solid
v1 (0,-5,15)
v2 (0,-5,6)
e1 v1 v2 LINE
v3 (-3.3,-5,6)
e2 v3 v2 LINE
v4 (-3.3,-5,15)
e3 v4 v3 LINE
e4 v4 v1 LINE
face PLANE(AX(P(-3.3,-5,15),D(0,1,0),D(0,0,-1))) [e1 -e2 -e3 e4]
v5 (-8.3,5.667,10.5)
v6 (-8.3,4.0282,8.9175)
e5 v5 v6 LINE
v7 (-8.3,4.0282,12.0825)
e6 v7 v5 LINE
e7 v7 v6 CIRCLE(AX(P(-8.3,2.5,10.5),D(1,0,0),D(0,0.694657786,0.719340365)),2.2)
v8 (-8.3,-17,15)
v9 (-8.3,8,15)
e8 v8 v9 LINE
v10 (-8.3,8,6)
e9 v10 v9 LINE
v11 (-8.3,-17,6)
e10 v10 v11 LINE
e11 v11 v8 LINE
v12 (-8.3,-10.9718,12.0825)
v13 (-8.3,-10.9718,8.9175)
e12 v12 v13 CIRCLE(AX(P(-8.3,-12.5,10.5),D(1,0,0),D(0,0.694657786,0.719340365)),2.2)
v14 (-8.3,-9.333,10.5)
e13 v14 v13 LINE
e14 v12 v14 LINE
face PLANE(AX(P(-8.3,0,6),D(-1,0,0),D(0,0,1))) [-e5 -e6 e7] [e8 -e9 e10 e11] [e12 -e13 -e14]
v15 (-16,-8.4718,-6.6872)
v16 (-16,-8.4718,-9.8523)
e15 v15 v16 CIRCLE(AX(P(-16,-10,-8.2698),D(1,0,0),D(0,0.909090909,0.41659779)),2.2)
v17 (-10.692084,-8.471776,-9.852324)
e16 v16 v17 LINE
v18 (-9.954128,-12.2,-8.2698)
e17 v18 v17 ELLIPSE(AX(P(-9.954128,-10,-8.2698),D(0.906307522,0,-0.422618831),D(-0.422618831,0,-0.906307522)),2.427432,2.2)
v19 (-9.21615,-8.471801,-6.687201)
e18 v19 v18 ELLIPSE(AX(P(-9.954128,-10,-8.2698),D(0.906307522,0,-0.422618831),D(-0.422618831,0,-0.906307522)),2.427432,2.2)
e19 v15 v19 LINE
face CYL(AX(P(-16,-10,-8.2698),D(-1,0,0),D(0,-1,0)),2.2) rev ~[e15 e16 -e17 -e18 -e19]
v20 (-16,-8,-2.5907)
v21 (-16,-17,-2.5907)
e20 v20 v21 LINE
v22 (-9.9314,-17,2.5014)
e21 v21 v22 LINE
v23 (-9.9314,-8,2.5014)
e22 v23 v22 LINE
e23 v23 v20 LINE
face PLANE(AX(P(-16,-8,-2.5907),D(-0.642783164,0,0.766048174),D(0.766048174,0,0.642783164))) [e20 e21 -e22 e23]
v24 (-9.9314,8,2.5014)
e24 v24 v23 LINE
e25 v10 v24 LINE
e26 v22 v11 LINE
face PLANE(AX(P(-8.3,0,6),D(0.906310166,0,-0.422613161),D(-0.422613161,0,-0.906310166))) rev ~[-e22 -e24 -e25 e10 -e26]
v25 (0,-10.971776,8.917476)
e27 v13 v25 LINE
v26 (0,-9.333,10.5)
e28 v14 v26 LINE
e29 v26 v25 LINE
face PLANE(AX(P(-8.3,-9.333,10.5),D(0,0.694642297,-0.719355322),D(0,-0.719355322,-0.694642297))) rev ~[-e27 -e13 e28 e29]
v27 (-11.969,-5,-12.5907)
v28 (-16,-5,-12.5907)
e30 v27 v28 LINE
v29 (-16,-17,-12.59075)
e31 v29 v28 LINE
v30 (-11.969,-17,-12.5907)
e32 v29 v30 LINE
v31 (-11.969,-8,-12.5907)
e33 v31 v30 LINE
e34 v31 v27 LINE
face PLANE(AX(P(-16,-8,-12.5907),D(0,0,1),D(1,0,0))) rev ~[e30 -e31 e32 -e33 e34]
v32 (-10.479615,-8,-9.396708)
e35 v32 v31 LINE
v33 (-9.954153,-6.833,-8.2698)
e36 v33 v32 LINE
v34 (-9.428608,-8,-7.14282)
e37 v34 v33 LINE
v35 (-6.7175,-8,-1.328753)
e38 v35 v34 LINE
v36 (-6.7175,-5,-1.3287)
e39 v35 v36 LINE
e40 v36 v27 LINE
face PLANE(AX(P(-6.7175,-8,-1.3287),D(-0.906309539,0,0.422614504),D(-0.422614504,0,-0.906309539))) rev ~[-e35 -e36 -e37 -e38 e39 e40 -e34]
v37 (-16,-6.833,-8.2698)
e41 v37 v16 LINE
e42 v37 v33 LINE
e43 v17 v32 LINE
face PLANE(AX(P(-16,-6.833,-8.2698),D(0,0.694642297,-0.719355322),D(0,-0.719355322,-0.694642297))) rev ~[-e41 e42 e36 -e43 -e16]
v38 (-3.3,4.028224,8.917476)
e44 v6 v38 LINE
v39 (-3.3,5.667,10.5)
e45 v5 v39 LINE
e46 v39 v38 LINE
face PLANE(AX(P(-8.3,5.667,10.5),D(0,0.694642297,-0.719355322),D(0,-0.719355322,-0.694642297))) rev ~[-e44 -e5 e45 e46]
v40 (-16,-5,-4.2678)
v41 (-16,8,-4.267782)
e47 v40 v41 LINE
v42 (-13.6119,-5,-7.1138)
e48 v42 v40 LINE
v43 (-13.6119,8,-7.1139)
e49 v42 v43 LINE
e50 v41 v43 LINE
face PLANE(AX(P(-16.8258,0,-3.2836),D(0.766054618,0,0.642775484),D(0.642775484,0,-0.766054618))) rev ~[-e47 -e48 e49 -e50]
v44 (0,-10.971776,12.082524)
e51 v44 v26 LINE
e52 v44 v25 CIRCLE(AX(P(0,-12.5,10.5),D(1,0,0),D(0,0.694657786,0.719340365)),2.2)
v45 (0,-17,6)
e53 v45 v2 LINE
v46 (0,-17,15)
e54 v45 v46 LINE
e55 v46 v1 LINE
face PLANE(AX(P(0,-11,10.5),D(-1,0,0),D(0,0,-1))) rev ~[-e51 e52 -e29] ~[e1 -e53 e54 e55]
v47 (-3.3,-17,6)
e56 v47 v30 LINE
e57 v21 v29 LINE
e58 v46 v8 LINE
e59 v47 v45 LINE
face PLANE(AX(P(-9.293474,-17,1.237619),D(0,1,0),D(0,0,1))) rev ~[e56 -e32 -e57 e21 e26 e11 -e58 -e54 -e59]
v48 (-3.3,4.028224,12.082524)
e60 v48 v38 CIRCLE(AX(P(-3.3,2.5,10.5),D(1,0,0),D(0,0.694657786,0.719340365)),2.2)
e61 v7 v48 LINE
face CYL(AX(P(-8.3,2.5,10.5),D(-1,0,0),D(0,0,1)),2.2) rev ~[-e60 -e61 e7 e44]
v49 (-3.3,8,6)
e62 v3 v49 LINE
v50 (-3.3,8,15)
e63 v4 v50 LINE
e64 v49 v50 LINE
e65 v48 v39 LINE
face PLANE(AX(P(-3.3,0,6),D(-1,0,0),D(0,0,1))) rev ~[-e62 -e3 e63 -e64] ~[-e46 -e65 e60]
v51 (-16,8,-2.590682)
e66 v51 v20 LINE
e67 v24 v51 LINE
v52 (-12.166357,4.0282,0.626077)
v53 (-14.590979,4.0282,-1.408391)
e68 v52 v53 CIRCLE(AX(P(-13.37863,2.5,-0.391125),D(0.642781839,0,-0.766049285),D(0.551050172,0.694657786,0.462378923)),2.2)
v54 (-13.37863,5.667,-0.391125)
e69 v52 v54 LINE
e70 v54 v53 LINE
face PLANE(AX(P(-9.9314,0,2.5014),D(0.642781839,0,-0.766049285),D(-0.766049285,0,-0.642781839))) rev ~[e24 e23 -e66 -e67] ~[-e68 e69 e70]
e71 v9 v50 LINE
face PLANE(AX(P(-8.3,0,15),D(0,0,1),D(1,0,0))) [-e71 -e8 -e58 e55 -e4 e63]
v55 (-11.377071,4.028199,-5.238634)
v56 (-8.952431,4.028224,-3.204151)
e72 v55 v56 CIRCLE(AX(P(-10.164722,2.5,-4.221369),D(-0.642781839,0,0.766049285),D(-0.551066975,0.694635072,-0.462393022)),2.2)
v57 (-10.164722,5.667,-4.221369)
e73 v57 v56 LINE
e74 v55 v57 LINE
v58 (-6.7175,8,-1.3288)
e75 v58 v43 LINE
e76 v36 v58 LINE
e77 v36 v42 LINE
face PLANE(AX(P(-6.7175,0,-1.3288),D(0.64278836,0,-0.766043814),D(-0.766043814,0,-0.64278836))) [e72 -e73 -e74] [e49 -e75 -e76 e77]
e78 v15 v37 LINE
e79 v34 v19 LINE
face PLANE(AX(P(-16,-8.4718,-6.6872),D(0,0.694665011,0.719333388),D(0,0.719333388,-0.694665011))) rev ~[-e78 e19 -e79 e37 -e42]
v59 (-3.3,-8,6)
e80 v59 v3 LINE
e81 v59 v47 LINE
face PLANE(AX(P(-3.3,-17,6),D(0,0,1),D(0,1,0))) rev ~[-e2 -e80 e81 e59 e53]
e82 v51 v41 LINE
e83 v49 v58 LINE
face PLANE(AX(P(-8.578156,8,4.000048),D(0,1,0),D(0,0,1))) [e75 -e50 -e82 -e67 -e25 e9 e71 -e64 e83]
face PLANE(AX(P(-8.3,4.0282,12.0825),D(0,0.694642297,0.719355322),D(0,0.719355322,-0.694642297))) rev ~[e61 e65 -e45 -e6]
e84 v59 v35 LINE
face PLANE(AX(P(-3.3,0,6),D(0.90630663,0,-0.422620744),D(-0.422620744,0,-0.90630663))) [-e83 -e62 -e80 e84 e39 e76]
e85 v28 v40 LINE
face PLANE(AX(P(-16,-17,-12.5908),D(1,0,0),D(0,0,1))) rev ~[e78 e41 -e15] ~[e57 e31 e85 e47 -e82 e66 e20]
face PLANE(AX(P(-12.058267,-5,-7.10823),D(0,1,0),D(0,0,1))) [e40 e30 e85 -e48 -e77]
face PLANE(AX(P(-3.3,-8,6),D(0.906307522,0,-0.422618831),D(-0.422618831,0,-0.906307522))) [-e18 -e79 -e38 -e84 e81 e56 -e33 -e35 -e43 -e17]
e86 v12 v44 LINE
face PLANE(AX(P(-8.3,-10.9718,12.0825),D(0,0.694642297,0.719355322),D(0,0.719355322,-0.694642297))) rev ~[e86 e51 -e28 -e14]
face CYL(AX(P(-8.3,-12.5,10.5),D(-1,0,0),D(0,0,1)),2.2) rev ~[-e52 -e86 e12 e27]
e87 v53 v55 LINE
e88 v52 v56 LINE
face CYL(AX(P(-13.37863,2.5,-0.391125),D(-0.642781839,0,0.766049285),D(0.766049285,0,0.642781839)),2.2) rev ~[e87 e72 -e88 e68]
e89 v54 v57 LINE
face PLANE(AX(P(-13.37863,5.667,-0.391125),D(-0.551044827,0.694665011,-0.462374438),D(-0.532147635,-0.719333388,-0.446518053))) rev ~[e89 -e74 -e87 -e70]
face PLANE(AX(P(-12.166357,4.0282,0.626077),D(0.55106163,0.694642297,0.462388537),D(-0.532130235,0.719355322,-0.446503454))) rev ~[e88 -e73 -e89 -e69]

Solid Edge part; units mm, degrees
sketch "Sketch1" plane through (0, 0, 0) normal (0, -1, 0) x (1, 0, 0)
  line L0 (-8.3, 6) -> (-8.3, 15)
  line L1 (-8.3, 15) -> (-3.3, 15)
  line L2 (-3.3, 6) -> (-3.3, 15)
  line L3 (-3.3, 6) -> (-6.7175, -1.3288)
  line L4 (-6.7175, -1.3288) -> (-13.6119, -7.1139)
  line L5 (-16.8258, -3.2836) -> (-13.6119, -7.1139)
  line L6 (-9.9314, 2.5014) -> (-16.8258, -3.2836)
  line L7 (-8.3, 6) -> (-9.9314, 2.5014)
extrude "ExtrudedProtrusion_1" add sketch "Sketch1" along normal mid plane 16
sketch "Sketch2" plane through (0, -8, 0) normal (0, -1, 0) x (1, 0, 0)
  line L0 (-8.3, 15) -> (-3.3, 15)
  line L1 (-3.3, 6) -> (-3.3, 15)
  line L2 (-3.3, 6) -> (-11.969, -12.5907)
  line L3 (-16, -12.5907) -> (-11.969, -12.5907)
  line L4 (-16, -2.5907) -> (-16, -12.5907)
  line L5 (-16, -2.5907) -> (-9.9314, 2.5014)
  line L6 (-9.9314, 2.5014) -> (-8.3, 6)
  line L7 (-8.3, 6) -> (-8.3, 15)
extrude "Protrusion1" add sketch "Sketch2" along normal blind 9
sketch "Sketch3" plane through (-16, -11.5, 1.2046) normal (-1, 0, 0) x (0, -1, 0)
  circle A0 centre (-1.5, -9.4744) radius 2.2
  dimension "D1" = 7
extrude "Cutout1" cut sketch "Sketch3" against normal through all
sketch "Sketch4" plane through (-11.3587, -8, -6.9597) normal (0, 1, 0) x (0, 0, 1)
  line L0 (-5.631, -0.6103) -> (-5.631, -4.6413)
  line L1 (-5.631, -4.6413) -> (2.6919, -4.6413)
  line L2 (-0.1541, -2.2532) -> (2.6919, -4.6413)
  line L3 (5.631, 4.6412) -> (-0.1541, -2.2532)
  line L4 (5.631, 4.6412) -> (-5.631, -0.6103)
extrude "ExtrudedProtrusion_5" add sketch "Sketch4" along normal blind 3
sketch "Sketch5" plane through (-9.65, -17, 1.2046) normal (0, -1, 0) x (1, 0, 0)
  line L0 (-6.35, -13.7954) -> (-6.35, 13.7954)
extrude "Cutout2" cut sketch "Sketch5" against normal through all material side at (-16.05, -17, 1.2046)
sketch "Sketch6" plane through (-12.9657, -4.5, -0.0447) normal (-0.6427876, 0, 0.7660444) x (0.7660444, 0, 0.6427876)
  circle A0 centre (-0.539, 7) radius 2.2
  dimension "D1" = 5.5
extrude "Cutout3" cut sketch "Sketch6" against normal through all
sketch "Sketch7" plane through (-12.9657, -4.5, -0.0447) normal (-0.6427876, 0, 0.7660444) x (0.7660444, 0, 0.6427876)
  line L0 (-0.539, 7) -> (1.0435, 8.5282)
  line L1 (1.0435, 8.5282) -> (-0.539, 10.167)
  line L2 (-0.539, 10.167) -> (-2.1216, 8.5282)
  line L3 (-2.1216, 8.5282) -> (-0.539, 7)
extrude "Cutout4" cut sketch "Sketch7" against normal through all
sketch "Sketch8" plane through (-16, -4.5, -7.5907) normal (-1, 0, 0) x (0, 0, 1)
  line L0 (-0.6791, -5.5) -> (0.9035, -3.9718)
  line L1 (0.9035, -3.9718) -> (-0.6791, -2.333)
  line L2 (-0.6791, -2.333) -> (-2.2616, -3.9718)
  line L3 (-2.2616, -3.9718) -> (-0.6791, -5.5)
extrude "Cutout5" cut sketch "Sketch8" against normal through all
sketch "Sketch9" plane through (-3.3, -4.5, 10.5) normal (1, 0, 0) x (0, 0, -1)
  line L0 (4.5, -12.5) -> (-4.5, -12.5)
  line L1 (-4.5, -12.5) -> (-4.5, -0.5)
  line L2 (-4.5, -0.5) -> (4.5, -0.5)
  line L3 (4.5, -12.5) -> (4.5, -0.5)
  dimension "D1" = 12
extrude "ExtrudedProtrusion_4" add sketch "Sketch9" along normal blind 3.3
sketch "Sketch10" plane through (-8.3, -4.5, 10.5) normal (-1, 0, 0) x (0, 0, 1)
  circle A0 centre (0, 7) radius 2.2
  circle A1 centre (0, -8) radius 2.2
  dimension "D1" = 15
  dimension "D2" = 5.5
extrude "Cutout6" cut sketch "Sketch10" against normal through all
sketch "Sketch11" plane through (-8.3, -4.5, 10.5) normal (-1, 0, 0) x (0, 0, 1)
  line L0 (0, 7) -> (1.5825, 8.5282)
  line L1 (1.5825, 8.5282) -> (0, 10.167)
  line L2 (0, 10.167) -> (-1.5825, 8.5282)
  line L3 (-1.5825, 8.5282) -> (0, 7)
  line L4 (0, -8) -> (1.5825, -6.4718)
  line L5 (1.5825, -6.4718) -> (0, -4.833)
  line L6 (0, -4.833) -> (-1.5825, -6.4718)
  line L7 (-1.5825, -6.4718) -> (0, -8)
extrude "Cutout7" cut sketch "Sketch11" against normal through all
